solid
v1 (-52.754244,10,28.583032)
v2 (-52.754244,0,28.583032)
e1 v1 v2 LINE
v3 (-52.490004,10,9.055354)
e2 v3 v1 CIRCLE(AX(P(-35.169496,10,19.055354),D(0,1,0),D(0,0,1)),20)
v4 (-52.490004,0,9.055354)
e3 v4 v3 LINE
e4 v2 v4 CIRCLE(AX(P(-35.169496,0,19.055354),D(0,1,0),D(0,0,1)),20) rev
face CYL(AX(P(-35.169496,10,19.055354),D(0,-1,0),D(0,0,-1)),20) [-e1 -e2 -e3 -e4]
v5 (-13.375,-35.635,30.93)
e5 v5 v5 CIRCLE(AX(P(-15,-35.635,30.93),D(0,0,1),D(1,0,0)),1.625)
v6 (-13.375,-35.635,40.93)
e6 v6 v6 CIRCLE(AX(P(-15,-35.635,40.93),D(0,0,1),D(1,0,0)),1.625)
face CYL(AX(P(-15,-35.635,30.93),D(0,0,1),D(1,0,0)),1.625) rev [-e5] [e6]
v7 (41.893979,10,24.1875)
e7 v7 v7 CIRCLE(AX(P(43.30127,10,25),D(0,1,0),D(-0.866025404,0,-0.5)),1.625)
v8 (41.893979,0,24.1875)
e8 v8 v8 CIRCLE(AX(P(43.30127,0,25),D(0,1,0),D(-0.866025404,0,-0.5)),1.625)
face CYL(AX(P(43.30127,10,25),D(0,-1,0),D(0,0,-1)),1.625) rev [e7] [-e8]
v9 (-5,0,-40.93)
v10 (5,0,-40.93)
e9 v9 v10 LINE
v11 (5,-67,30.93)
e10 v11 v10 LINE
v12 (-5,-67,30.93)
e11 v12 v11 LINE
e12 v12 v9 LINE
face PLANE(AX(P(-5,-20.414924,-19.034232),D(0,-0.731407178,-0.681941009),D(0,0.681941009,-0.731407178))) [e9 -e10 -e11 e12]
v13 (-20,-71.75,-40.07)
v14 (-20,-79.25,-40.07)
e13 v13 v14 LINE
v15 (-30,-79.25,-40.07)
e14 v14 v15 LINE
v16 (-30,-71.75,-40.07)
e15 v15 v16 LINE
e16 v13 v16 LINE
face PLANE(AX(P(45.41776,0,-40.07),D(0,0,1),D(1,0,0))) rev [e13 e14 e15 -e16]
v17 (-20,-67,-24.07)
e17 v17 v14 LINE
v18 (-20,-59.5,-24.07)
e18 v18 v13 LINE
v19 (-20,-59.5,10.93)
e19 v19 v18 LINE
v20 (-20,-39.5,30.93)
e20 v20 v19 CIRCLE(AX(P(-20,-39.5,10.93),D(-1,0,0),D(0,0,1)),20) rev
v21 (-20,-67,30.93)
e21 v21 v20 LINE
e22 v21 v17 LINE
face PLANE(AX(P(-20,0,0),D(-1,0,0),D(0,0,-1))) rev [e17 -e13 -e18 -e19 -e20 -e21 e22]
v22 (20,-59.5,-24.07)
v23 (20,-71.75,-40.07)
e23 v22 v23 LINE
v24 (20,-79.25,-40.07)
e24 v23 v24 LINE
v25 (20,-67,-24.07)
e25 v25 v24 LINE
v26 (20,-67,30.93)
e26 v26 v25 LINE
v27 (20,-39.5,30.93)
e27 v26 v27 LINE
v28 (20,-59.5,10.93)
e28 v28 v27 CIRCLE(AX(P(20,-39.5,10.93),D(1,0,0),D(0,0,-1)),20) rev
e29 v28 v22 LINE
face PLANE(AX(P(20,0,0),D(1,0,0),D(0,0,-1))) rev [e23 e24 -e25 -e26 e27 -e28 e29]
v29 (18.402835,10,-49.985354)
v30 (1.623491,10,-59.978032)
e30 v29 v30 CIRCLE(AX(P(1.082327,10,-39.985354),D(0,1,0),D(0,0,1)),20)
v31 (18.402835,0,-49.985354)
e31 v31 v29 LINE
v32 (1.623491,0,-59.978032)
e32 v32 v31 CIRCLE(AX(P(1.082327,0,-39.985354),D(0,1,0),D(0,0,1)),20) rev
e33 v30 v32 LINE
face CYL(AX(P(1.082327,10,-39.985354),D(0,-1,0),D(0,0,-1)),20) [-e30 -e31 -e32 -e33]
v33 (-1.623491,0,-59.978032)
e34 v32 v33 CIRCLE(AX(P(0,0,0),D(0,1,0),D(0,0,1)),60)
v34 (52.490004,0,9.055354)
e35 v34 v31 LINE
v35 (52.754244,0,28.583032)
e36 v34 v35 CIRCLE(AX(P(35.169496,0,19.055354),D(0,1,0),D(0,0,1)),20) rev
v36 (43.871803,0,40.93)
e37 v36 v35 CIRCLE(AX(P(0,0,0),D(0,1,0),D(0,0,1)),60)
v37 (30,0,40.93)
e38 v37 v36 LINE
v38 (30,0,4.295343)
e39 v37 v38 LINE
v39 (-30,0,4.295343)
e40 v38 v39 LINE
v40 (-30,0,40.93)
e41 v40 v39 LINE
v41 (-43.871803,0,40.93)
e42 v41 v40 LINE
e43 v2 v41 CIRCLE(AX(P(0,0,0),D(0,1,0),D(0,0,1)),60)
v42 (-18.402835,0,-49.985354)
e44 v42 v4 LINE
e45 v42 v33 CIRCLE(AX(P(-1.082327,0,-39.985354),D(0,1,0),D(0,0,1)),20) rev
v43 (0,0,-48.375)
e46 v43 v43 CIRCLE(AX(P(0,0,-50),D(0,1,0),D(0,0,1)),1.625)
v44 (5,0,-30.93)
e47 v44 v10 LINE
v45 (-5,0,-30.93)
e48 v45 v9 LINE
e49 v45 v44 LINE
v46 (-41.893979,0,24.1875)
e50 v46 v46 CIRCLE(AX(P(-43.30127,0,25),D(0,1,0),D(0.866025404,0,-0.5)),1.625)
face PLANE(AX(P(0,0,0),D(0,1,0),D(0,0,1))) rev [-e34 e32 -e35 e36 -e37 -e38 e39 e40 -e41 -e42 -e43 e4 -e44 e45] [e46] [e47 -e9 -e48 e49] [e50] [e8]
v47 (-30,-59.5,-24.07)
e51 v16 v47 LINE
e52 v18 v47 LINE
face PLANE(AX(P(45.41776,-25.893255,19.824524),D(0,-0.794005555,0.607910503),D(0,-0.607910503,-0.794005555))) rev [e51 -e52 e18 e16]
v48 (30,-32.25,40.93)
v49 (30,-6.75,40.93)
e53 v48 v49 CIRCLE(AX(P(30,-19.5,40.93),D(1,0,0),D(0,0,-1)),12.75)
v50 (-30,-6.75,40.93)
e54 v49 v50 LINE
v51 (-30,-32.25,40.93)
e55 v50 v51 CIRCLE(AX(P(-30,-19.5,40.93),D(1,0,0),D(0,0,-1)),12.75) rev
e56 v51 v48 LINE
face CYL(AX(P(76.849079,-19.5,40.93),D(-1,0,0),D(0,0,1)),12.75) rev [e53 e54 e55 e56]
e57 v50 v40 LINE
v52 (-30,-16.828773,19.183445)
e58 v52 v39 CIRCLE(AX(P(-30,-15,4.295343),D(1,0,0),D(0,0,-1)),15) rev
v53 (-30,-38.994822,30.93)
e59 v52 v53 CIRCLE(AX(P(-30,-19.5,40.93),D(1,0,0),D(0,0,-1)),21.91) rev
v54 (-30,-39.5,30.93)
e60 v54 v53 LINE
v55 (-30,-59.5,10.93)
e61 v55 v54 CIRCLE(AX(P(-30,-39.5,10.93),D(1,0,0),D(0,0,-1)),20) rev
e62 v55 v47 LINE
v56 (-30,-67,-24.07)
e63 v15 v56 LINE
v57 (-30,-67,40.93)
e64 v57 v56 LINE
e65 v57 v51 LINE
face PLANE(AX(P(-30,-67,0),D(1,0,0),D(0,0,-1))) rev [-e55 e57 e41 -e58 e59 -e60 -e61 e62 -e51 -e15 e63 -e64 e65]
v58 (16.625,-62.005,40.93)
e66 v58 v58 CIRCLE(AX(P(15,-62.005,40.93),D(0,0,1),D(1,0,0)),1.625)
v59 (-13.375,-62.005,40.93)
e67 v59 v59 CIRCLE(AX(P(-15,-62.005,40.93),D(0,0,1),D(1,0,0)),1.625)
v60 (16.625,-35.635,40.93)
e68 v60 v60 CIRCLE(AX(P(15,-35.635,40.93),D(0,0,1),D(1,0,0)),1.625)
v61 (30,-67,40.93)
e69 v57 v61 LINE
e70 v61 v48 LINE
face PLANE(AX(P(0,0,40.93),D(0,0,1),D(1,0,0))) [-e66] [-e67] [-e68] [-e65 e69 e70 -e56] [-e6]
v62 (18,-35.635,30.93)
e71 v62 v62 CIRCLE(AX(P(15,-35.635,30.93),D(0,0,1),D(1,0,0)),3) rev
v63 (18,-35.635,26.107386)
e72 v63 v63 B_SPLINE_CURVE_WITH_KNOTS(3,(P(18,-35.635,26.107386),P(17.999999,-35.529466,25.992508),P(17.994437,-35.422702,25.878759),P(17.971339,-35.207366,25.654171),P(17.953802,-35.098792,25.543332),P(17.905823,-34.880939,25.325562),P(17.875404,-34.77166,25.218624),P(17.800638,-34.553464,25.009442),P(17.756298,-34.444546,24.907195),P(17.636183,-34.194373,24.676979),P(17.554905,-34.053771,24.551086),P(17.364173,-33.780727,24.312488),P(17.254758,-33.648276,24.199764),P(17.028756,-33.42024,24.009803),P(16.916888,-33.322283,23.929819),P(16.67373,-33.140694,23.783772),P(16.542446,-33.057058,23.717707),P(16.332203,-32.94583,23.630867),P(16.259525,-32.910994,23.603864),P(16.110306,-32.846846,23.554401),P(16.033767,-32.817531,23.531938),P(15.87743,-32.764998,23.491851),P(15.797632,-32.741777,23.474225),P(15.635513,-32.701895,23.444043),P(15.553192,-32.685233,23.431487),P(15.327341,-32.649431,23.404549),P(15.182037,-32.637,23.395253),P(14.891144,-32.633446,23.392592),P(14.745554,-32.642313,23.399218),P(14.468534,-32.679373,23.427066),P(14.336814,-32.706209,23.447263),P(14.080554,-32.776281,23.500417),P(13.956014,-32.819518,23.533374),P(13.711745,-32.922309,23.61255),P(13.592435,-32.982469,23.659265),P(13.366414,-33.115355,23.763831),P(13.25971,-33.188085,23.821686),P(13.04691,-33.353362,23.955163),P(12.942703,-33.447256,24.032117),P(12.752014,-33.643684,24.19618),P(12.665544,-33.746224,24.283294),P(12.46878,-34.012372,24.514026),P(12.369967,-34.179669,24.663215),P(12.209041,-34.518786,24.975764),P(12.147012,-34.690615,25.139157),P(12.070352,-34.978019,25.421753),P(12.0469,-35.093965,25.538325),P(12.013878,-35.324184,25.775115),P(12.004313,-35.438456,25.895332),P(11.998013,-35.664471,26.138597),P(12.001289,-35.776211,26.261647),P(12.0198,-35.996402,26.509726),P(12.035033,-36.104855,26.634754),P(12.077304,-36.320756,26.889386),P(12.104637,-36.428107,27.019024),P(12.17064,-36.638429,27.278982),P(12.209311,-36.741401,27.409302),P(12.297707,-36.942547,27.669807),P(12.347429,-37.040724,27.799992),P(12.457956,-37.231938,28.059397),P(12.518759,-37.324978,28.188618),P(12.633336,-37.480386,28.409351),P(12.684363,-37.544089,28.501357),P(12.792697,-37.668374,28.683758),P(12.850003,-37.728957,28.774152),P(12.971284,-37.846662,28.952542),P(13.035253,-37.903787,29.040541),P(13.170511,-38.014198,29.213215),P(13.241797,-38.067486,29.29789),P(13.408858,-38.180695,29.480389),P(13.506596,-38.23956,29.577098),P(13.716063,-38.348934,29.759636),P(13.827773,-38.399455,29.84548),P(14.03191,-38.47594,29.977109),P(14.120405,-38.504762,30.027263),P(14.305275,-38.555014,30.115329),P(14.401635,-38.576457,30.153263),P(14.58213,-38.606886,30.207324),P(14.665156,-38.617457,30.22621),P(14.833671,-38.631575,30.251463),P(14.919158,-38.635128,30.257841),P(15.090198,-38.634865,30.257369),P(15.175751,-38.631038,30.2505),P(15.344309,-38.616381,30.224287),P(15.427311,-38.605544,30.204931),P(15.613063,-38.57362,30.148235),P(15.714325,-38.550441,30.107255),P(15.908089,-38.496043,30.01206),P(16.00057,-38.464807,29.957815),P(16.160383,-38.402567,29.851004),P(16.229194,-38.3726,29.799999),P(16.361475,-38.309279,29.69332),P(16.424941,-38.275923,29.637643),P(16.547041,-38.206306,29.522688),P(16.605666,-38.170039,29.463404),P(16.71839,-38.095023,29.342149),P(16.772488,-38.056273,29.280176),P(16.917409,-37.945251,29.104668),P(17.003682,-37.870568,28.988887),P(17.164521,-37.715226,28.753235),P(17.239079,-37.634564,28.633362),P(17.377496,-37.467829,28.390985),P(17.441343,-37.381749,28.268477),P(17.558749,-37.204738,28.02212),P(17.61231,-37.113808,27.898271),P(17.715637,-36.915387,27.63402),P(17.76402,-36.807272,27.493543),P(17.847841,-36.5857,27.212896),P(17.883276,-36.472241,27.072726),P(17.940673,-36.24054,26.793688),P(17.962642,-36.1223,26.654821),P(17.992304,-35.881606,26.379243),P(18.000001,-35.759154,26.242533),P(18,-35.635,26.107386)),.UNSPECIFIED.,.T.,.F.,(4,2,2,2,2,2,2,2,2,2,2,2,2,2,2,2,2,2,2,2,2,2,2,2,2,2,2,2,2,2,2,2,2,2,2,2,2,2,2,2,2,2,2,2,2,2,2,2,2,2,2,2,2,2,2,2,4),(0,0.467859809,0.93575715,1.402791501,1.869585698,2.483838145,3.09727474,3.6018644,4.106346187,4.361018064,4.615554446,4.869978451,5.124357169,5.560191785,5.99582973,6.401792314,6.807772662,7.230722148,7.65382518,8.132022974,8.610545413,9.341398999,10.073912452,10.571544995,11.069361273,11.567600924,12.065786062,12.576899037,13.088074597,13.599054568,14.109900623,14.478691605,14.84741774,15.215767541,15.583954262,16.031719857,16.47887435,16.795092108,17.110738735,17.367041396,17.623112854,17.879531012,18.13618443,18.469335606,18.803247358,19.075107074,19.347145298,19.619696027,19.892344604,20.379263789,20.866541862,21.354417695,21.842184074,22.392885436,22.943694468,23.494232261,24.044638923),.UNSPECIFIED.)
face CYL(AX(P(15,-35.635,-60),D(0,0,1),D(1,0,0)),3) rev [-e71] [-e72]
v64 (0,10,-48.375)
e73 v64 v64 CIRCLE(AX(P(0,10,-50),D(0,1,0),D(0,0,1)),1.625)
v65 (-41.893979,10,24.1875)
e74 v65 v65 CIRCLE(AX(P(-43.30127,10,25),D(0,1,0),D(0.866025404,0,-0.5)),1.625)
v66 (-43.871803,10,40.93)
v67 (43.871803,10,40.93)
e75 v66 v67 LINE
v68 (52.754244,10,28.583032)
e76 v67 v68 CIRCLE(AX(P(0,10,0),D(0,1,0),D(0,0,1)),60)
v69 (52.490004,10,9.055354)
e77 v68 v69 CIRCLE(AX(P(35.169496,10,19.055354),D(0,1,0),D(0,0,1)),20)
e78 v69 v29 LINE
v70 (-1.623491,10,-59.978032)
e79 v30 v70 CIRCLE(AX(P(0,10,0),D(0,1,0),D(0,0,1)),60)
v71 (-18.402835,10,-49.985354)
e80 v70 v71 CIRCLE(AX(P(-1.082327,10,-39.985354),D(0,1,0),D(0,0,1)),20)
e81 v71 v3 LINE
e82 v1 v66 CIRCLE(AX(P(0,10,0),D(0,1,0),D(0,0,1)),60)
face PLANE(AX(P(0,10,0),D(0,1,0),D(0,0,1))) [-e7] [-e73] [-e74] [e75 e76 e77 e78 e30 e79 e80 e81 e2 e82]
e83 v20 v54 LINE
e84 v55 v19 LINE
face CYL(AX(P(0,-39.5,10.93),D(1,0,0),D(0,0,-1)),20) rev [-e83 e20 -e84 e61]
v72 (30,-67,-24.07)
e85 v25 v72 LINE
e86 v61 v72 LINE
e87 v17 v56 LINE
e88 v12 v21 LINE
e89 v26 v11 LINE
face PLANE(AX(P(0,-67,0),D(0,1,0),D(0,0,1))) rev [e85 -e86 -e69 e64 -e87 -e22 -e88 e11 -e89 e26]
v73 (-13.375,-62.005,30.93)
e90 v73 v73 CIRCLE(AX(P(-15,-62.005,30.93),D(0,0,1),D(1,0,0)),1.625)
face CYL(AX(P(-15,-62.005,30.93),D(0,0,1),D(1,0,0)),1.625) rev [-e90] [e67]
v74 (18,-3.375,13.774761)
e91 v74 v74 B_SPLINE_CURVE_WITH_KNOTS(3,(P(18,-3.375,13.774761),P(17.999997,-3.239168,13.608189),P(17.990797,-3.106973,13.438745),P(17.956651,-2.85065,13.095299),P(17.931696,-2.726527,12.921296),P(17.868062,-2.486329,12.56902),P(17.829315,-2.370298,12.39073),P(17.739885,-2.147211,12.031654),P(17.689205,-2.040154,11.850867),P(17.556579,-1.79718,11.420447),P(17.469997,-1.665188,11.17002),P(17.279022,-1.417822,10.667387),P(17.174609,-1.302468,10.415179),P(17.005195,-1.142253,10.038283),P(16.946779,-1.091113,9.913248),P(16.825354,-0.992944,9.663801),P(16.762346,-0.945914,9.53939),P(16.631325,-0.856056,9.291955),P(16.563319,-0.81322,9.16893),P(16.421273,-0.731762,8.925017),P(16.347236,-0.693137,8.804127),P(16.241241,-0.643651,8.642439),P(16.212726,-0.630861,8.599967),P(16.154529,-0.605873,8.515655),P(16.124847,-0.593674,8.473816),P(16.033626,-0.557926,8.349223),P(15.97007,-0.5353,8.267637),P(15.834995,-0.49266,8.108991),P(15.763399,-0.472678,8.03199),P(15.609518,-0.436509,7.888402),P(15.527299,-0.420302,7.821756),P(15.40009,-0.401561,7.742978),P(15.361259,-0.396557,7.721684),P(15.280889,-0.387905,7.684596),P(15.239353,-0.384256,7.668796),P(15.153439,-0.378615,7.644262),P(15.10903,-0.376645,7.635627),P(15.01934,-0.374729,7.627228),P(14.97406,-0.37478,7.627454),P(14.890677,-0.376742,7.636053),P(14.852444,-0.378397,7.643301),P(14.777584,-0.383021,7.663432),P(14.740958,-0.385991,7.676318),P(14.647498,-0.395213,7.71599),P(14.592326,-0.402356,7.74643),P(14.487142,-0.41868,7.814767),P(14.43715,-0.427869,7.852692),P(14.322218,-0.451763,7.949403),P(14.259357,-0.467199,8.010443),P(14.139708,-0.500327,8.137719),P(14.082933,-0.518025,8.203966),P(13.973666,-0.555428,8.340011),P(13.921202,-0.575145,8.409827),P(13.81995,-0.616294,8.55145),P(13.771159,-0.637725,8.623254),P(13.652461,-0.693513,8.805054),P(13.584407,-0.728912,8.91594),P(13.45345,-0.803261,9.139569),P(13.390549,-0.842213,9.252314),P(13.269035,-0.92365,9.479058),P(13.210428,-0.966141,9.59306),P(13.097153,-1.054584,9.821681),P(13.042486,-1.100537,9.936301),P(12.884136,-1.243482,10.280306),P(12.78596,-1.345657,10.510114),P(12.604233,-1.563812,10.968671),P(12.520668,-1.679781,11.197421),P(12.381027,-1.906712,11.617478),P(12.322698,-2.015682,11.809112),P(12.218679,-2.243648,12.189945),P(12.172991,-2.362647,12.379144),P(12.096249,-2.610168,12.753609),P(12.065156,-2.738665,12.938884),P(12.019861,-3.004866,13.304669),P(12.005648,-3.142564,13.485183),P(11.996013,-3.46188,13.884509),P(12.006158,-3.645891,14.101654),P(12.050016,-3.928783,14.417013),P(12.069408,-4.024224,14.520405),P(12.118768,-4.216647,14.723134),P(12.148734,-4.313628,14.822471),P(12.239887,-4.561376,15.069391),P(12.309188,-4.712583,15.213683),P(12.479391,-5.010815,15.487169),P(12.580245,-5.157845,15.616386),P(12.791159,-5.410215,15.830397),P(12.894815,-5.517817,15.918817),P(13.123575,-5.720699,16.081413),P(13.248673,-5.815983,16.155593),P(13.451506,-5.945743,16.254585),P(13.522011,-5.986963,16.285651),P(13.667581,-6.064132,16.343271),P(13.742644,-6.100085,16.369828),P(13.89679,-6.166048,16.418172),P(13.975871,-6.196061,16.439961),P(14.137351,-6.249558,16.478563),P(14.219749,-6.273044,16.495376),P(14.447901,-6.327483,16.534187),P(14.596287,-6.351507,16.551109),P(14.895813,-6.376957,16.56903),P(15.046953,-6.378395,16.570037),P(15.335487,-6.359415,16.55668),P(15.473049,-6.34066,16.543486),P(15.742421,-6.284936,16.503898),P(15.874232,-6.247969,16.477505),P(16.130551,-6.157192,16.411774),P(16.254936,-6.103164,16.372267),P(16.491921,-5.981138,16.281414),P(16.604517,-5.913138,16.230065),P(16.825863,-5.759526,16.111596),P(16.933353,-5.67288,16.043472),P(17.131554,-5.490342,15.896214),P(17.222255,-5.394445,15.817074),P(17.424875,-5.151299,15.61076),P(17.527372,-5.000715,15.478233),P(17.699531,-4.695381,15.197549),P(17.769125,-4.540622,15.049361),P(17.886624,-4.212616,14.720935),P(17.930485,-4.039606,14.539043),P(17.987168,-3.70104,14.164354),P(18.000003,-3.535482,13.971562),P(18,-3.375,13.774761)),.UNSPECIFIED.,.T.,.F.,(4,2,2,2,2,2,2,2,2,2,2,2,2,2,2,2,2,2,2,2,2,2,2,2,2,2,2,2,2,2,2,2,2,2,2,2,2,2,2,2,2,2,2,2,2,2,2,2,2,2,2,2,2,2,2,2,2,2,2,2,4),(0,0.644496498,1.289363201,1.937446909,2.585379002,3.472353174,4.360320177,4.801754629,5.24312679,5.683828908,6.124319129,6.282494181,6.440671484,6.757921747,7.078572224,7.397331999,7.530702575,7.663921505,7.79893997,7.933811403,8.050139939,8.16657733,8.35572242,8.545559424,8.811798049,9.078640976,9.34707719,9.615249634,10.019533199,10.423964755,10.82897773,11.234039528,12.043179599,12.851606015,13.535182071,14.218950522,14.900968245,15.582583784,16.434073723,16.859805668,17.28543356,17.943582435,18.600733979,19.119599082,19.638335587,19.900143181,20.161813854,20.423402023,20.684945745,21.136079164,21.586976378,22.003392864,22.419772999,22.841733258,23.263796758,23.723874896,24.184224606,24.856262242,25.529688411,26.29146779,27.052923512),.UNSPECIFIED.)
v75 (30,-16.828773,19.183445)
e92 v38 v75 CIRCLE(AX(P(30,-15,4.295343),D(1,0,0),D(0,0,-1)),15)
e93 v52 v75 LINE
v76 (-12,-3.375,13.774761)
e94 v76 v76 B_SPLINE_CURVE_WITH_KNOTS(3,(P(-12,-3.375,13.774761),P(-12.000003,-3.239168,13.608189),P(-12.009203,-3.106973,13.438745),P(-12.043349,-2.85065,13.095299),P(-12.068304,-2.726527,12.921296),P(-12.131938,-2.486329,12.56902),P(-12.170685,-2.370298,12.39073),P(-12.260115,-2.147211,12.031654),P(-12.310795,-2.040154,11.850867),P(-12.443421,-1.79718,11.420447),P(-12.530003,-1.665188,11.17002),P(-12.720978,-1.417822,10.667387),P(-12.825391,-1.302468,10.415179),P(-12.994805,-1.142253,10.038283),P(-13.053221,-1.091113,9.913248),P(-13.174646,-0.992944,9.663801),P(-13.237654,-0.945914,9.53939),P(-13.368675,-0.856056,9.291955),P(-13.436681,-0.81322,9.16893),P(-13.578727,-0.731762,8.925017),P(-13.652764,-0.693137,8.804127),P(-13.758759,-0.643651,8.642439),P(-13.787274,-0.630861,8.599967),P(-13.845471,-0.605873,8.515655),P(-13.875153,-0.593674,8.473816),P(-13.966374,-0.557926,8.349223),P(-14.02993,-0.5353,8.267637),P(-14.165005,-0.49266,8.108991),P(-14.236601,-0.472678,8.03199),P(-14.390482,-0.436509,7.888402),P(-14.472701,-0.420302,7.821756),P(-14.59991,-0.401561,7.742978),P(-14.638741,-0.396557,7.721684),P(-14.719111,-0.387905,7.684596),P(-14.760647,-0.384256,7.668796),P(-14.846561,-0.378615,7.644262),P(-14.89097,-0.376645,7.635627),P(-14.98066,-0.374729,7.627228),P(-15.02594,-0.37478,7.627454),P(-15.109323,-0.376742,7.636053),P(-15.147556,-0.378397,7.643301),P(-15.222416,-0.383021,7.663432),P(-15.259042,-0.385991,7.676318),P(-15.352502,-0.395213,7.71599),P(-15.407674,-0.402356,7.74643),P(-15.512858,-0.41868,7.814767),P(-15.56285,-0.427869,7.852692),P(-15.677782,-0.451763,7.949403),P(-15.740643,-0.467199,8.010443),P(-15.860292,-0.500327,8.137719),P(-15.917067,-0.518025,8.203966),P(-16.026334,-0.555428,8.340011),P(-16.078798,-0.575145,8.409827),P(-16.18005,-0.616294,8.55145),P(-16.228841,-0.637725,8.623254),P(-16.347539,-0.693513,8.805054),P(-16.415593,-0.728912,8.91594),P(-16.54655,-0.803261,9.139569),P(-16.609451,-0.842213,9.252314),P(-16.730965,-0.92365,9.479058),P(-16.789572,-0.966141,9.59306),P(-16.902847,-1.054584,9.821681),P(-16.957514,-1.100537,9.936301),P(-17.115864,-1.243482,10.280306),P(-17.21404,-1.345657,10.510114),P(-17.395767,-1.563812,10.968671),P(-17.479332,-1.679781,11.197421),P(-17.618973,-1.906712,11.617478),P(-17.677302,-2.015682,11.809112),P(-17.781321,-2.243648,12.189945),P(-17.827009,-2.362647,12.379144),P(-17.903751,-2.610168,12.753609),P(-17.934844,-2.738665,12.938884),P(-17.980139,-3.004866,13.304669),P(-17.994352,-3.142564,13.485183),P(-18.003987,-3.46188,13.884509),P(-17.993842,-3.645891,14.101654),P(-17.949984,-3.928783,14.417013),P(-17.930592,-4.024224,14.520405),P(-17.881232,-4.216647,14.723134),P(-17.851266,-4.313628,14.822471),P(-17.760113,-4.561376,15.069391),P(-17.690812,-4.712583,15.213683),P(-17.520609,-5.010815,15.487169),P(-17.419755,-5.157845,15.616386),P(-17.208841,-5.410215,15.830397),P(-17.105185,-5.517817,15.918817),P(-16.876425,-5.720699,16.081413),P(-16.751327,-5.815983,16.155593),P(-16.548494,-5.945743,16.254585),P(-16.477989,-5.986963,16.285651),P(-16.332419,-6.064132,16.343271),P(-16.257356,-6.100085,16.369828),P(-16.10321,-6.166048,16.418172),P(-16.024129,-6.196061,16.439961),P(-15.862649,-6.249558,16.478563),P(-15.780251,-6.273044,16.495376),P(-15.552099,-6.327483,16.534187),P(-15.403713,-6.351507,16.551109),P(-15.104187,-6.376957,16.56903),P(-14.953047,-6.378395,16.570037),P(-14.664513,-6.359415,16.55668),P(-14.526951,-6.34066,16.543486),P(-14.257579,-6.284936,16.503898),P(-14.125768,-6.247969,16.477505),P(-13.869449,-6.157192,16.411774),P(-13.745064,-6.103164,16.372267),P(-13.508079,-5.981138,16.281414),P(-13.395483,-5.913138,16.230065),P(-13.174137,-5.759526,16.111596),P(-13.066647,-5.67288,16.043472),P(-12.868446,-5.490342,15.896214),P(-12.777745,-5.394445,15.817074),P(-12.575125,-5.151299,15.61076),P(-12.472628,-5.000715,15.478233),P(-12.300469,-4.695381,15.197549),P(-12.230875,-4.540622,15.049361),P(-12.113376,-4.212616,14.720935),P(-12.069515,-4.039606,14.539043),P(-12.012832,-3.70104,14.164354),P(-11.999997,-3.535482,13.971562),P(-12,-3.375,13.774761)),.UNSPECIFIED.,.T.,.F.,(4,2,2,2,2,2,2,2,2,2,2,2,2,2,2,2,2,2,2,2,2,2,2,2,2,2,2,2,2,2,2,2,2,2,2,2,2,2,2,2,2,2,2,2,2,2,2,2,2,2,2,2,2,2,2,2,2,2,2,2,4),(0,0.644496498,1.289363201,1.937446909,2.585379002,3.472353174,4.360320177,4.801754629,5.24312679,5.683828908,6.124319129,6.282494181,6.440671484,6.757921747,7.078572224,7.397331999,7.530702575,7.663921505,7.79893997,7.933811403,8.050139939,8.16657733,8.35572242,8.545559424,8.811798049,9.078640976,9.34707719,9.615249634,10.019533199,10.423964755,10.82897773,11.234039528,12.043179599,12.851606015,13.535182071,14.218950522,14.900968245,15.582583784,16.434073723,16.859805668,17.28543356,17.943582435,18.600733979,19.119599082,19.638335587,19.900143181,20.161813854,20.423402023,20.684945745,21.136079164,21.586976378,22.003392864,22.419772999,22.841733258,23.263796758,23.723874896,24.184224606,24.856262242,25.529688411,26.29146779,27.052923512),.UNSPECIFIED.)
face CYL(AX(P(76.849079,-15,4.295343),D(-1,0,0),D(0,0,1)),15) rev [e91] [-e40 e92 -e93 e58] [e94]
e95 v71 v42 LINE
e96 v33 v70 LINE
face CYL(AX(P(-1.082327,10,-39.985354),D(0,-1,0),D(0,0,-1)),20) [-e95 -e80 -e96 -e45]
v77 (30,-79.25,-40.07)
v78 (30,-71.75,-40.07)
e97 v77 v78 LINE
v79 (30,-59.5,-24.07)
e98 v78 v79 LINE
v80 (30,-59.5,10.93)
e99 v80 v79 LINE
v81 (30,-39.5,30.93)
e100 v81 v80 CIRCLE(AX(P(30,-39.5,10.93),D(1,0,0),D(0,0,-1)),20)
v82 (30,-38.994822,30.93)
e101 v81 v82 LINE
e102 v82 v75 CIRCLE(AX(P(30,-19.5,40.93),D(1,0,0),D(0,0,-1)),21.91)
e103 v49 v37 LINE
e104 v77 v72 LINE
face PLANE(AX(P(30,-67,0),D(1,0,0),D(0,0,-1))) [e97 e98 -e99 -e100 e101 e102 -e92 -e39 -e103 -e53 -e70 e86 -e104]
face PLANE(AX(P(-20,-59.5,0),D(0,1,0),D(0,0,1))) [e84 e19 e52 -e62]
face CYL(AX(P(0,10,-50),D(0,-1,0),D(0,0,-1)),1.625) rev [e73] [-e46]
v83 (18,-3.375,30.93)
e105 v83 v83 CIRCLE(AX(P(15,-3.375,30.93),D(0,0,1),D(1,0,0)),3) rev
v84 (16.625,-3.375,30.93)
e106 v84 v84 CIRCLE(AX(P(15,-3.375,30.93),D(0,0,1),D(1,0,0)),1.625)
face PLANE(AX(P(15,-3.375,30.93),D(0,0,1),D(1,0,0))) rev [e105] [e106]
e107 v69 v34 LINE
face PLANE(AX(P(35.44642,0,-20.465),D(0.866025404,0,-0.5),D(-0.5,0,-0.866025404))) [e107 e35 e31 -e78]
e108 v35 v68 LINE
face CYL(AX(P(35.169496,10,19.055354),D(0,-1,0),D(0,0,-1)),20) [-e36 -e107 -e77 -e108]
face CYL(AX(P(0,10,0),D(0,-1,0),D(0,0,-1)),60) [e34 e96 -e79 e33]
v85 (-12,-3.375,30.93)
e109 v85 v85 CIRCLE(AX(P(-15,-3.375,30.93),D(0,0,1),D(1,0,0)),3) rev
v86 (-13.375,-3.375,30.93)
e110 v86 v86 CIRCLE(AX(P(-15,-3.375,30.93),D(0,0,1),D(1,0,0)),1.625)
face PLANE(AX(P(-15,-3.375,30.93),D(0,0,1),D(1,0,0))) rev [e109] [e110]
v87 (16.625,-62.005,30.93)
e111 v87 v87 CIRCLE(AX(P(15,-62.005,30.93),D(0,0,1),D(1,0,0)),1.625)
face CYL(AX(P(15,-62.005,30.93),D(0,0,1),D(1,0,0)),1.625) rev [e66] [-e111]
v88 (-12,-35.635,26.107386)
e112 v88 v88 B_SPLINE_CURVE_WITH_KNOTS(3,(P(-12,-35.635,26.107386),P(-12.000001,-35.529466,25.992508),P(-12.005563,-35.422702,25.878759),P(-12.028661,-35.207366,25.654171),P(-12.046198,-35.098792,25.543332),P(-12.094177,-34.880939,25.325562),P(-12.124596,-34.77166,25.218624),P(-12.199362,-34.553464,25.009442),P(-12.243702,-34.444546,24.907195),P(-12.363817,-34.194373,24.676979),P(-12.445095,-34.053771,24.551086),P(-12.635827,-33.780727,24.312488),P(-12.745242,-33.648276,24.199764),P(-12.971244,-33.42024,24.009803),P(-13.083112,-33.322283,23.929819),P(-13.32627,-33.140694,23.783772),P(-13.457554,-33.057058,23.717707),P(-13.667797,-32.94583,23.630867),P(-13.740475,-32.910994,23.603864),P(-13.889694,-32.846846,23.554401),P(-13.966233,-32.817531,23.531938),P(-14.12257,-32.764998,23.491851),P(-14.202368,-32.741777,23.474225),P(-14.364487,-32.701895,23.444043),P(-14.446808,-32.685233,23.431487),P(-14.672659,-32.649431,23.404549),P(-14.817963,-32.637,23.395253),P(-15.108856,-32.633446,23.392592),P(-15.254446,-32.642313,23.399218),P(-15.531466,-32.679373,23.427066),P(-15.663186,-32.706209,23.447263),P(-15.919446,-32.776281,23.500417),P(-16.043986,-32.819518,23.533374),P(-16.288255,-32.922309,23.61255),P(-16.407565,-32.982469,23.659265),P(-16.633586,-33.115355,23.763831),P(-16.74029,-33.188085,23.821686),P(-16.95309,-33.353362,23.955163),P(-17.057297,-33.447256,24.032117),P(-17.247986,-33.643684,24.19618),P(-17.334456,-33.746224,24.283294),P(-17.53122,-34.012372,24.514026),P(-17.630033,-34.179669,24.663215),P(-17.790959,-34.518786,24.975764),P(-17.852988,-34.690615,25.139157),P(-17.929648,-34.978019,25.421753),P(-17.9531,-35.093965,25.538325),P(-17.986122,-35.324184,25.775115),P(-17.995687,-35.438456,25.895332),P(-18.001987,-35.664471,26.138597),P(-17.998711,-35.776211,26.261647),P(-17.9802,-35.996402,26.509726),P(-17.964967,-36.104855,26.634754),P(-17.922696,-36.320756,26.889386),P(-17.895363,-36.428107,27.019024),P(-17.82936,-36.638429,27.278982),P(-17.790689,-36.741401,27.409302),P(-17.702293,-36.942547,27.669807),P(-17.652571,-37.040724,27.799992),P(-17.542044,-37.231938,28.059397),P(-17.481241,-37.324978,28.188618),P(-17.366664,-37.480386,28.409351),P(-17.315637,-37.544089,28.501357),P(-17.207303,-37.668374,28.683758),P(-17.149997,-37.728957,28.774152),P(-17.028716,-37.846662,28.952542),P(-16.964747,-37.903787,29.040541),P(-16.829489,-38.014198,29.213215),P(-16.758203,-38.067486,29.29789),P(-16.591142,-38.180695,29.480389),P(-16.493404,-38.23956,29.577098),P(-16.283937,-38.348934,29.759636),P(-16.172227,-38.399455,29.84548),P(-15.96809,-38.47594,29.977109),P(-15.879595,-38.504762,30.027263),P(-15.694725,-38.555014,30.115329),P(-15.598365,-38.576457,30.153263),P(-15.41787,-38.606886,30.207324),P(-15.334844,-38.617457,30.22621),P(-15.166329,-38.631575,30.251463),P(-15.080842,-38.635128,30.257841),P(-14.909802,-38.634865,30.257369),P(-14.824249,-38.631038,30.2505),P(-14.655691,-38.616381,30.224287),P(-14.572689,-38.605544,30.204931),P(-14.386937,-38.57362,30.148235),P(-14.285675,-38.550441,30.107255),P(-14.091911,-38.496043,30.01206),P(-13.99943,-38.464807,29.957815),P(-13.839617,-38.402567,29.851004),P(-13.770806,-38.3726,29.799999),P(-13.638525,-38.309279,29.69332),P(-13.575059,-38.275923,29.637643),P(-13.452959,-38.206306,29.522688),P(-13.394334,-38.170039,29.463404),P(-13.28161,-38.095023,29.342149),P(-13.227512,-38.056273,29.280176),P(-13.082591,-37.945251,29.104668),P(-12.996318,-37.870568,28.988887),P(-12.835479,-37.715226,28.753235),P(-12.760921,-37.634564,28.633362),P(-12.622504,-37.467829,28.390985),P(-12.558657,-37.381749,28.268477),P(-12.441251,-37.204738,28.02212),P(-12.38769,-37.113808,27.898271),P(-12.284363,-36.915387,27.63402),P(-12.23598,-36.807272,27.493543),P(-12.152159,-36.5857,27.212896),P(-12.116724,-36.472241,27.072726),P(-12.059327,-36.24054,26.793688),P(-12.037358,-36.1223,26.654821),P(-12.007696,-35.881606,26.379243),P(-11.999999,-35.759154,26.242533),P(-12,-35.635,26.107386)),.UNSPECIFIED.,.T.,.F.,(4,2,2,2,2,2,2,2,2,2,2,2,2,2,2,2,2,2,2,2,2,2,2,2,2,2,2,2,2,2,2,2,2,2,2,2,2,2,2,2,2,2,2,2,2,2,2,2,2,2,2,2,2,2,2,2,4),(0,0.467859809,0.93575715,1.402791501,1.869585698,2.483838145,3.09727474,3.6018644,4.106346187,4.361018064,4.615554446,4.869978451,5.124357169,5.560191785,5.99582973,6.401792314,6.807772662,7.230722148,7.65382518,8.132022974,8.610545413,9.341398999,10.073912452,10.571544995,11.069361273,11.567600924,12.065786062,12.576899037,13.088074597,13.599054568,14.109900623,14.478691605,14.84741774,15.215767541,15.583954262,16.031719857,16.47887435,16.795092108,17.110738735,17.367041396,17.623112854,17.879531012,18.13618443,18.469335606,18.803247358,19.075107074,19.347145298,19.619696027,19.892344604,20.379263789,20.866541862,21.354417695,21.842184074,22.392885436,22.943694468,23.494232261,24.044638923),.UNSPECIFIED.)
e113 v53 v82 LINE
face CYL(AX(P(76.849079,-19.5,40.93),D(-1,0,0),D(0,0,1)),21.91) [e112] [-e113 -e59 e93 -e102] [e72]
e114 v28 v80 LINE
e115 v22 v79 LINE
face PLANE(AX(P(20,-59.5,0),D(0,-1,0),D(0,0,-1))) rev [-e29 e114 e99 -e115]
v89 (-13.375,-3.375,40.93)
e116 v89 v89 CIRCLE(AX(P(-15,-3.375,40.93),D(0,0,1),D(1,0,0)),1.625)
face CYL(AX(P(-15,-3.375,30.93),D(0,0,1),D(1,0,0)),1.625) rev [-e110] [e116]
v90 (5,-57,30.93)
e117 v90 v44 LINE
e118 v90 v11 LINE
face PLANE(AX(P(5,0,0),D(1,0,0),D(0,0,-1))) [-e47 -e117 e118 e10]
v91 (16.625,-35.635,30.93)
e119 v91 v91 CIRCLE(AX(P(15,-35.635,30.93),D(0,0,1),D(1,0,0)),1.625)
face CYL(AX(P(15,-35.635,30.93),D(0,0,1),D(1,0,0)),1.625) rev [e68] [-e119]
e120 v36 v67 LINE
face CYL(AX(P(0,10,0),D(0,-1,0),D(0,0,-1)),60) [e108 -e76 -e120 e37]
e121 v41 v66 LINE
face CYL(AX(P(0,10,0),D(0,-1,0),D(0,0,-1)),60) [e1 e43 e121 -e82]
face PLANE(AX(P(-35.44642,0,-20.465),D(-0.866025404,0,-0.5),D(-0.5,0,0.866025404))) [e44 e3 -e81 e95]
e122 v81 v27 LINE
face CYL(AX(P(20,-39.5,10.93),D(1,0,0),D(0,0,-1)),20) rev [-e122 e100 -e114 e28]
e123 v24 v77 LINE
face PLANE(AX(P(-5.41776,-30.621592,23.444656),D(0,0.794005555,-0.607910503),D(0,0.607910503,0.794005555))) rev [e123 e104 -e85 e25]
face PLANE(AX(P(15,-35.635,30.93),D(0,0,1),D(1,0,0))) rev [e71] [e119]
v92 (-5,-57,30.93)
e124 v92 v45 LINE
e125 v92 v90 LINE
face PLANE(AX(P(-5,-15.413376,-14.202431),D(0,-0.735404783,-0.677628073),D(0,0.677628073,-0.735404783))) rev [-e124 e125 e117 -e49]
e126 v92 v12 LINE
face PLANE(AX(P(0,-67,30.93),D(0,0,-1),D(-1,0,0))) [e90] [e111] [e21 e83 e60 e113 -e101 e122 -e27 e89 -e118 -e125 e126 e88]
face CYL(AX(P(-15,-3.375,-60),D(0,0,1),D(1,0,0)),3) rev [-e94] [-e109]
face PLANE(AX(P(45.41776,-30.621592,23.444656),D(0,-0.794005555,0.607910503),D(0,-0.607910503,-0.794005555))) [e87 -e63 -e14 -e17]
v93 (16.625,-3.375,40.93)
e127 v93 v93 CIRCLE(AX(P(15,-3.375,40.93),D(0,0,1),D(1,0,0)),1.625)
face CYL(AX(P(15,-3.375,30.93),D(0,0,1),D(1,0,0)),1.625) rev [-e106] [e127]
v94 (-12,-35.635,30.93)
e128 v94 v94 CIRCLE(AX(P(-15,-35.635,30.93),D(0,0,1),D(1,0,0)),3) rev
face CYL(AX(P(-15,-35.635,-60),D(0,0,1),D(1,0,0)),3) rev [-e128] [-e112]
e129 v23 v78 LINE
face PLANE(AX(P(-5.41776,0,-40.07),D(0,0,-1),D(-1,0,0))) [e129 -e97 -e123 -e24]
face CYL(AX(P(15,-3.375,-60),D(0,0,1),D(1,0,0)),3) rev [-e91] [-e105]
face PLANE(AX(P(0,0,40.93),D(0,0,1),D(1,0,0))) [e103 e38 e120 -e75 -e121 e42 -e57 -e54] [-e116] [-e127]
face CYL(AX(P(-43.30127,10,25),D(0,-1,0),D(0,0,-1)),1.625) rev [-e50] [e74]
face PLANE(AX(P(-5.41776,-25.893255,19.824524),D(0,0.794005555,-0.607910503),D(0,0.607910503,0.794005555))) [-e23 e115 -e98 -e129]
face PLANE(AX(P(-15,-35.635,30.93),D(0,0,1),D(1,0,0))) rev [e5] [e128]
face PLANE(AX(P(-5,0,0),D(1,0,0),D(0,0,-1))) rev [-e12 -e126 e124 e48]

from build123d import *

# Parameters (mm, degrees)
SKETCH1_R                       = 60
BOSS_EXTRUDE1_DEPTH             = 10
SKETCH1_3_R                     = 1.625
CUT_EXTRUDE1_DEPTH              = 86.440037453
CIRPATTERN1_COUNT               = 3
CUT_EXTRUDE2_DEPTH              = 86.440037453
CIRPATTERN2_COUNT               = 3
BOSS_EXTRUDE2_DEPTH             = 77
BOSS_EXTRUDE3_REACH             = 108.685
BOSS_EXTRUDE3_DIRECTION_2_REACH = 108.685
FILLET1_R                       = 15
CUT_EXTRUDE3_DEPTH              = 107.685194831
CUT_EXTRUDE3_DEPTH_BACK         = 107.685194831
SKETCH4_4_R                     = 12.75
BOSS_EXTRUDE4_DEPTH             = 5
BOSS_EXTRUDE4_DEPTH_BACK        = 5
SKETCH7_R                       = 3
CUT_EXTRUDE4_DEPTH              = 135.046990627
SKETCH8_R                       = 3
SKETCH8_R_2                     = 1.625
BOSS_EXTRUDE5_DEPTH             = 10
LPATTERN2_COUNT                 = 2
LPATTERN2_PITCH                 = 32.26
LPATTERN3_COUNT                 = 2
LPATTERN3_PITCH                 = 58.63
FILLET2_R                       = 20
FILLET3_R                       = 20
FILLET4_R                       = 20
FILLET5_R                       = 20
SKETCH9_W                       = 55
SKETCH9_H                       = 7.5
BOSS_EXTRUDE6_DEPTH             = 10
BOSS_EXTRUDE7_DEPTH             = 10
FILLET6_R                       = 20
FILLET7_R                       = 20


with BuildPart() as part:
    # Sketch1 → Boss-Extrude1 (new body)
    with BuildSketch(Plane(origin=(0, 0, 0), x_dir=(1, 0, 0), z_dir=(0, 1, 0))):
        with Locations(Location((0, 0, 0), (0, 0, 270))):
            Circle(SKETCH1_R)
    extrude(amount=BOSS_EXTRUDE1_DEPTH)

    # Sketch1<3> → Cut-Extrude1 (cut, through all)
    with BuildSketch(Plane(origin=(0, 0, 0), x_dir=(1, 0, 0), z_dir=(0, 1, 0))):
        with Locations(Location((0, 50, 0), (0, 0, 270))):
            Circle(SKETCH1_3_R)
    cut_extrude1 = extrude(amount=CUT_EXTRUDE1_DEPTH, mode=Mode.SUBTRACT)

    # CirPattern1: Cut-Extrude1 ×3 about axis
    cirpattern1_axis = Axis((0, 0, 0), (0, 1, 0))
    for i in range(1, CIRPATTERN1_COUNT):
        add(cut_extrude1.rotate(cirpattern1_axis, i * 360 / CIRPATTERN1_COUNT), mode=Mode.SUBTRACT)

    # Sketch2 → Cut-Extrude2 (cut, through all)
    with BuildSketch(Plane(origin=(0, 10, 0), x_dir=(1, 0, 0), z_dir=(0, 1, 0))):
        with BuildLine():
            Line((43.871803017, -40.93), (0, -40.93))
            Line((0, -40.93), (-43.871803017, -40.93))
            ThreePointArc((-43.871803017, -40.93), (0, -60), (43.871803017, -40.93))
        make_face()
    cut_extrude2 = extrude(amount=-CUT_EXTRUDE2_DEPTH, mode=Mode.SUBTRACT)

    # CirPattern2: Cut-Extrude2 ×3 about axis
    cirpattern2_axis = Axis((0, 10.5, 0), (0, -1, 0))
    for i in range(1, CIRPATTERN2_COUNT):
        add(cut_extrude2.rotate(cirpattern2_axis, i * 360 / CIRPATTERN2_COUNT), mode=Mode.SUBTRACT)

    # Sketch3 → Boss-Extrude2 (add)
    with BuildSketch(Plane(origin=(0, 10, 0), x_dir=(1, 0, 0), z_dir=(0, 1, 0))):
        Polygon((-30, -40.93), (0, -40.93), (30, -40.93), (30, -30.93), (-30, -30.93), align=None)
    extrude(amount=-BOSS_EXTRUDE2_DEPTH)

    # Boss-Extrude3: up to this face of the body (flat: up to its plane)
    boss_extrude3_end = Plane(part.part.faces().sort_by_distance((30, -33.5, 35.93))[0])
    # Sketch4 → Boss-Extrude3 (add, up to the picked face)
    with BuildSketch(Plane(origin=(0, 0, 0), x_dir=(0, 0, -1), z_dir=(1, 0, 0)), mode=Mode.PRIVATE) as boss_extrude3_sk1:
        with BuildLine():
            ThreePointArc((-19.02, -19.5), (-22.236059714, -8.072633873), (-30.940100101, 0))
            Line((-30.940100101, 0), (-40.93, 0))
            Line((-40.93, 0), (-40.93, -6.75))
            ThreePointArc((-40.93, -6.75), (-31.91438854, -10.48438854), (-28.18, -19.5))
            ThreePointArc((-28.18, -19.5), (-31.91438854, -28.51561146), (-40.93, -32.25))
            Line((-40.93, -32.25), (-40.93, -41.41))
            ThreePointArc((-40.93, -41.41), (-25.437290424, -34.992709576), (-19.02, -19.5))
        make_face()
    boss_extrude3_tool1 = split(extrude(boss_extrude3_sk1.sketch, amount=BOSS_EXTRUDE3_REACH, mode=Mode.PRIVATE), bisect_by=boss_extrude3_end, keep=Keep.BOTH, mode=Mode.PRIVATE)
    add(boss_extrude3_tool1.solids().sort_by(Axis((0, -10.153116, 31.583116), (1, 0, 0)))[0])

    # Boss-Extrude3 direction 2: up to this face of the body (flat: up to its plane)
    boss_extrude3_direction_2_end = Plane(part.part.faces().sort_by_distance((-30, -33.5, 35.93))[0])
    # Sketch4 → Boss-Extrude3 direction 2 (add, up to the picked face)
    with BuildSketch(Plane(origin=(0, 0, 0), x_dir=(0, 0, -1), z_dir=(1, 0, 0)), mode=Mode.PRIVATE) as boss_extrude3_direction_2_sk1:
        with BuildLine():
            ThreePointArc((-19.02, -19.5), (-22.236059714, -8.072633873), (-30.940100101, 0))
            Line((-30.940100101, 0), (-40.93, 0))
            Line((-40.93, 0), (-40.93, -6.75))
            ThreePointArc((-40.93, -6.75), (-31.91438854, -10.48438854), (-28.18, -19.5))
            ThreePointArc((-28.18, -19.5), (-31.91438854, -28.51561146), (-40.93, -32.25))
            Line((-40.93, -32.25), (-40.93, -41.41))
            ThreePointArc((-40.93, -41.41), (-25.437290424, -34.992709576), (-19.02, -19.5))
        make_face()
    boss_extrude3_direction_2_tool1 = split(extrude(boss_extrude3_direction_2_sk1.sketch, amount=-BOSS_EXTRUDE3_DIRECTION_2_REACH, mode=Mode.PRIVATE), bisect_by=boss_extrude3_direction_2_end, keep=Keep.BOTH, mode=Mode.PRIVATE)
    add(boss_extrude3_direction_2_tool1.solids().sort_by(Axis((0, -10.153116, 31.583116), (-1, 0, 0)))[0])

    # Fillet1
    # the kernel refuses this fillet: 15 mm, written as the material it adds along each edge
    with BuildSketch(Plane(origin=(30, 0, 30.93), x_dir=(0, -0.8200000187317444, -0.5723634940140216), z_dir=(-1, 0, 0))) as fillet1_piece_1:
        with BuildLine():
            CenterArc((27.544705674, -13.254966901), FILLET1_R, 117.912385257, 97.002819116)
            Line((15.244705393, -21.840419312), (14.014705365, -22.698964553))
            Line((14.014705365, -22.698964553), (-1.230000028, -0.858545241))
            Line((-1.230000028, -0.858545241), (-0.858545241, 1.230000028))
            ThreePointArc((-0.858545241, 1.230000028), (0.706809752, 1.32825728), (19.820711794, 1.32549669))
            Line((19.820711794, 1.32549669), (20.522893056, 0))
        make_face()
    extrude(amount=60)
    with BuildSketch(Plane(origin=(30, -0.00517761, 30.93), x_dir=(0, -0.819917344642304, -0.5724819193255918), z_dir=(-1, 0, 0))) as fillet1_piece_2:
        with BuildLine():
            CenterArc((27.542374568, -13.253952614), FILLET1_R, 117.920660394, 97.002819116)
            Line((15.243614398, -21.841181404), (14.013738381, -22.699904283))
            ThreePointArc((14.013738381, -22.699904283), (-1.23412123, -0.861686967), (-0.858722879, 1.229876017))
            Line((-0.858722879, 1.229876017), (0.702372694, 1.325395261))
            ThreePointArc((0.702372694, 1.325395261), (10.259323815, -1.050393215), (19.816274935, 1.325395261))
            Line((19.816274935, 1.325395261), (20.518647629, 0))
        make_face()
    extrude(amount=60)

    # Sketch4<4> → Cut-Extrude3 (cut, two sides: drawn at the far end of the back side and taken through both)
    with BuildSketch(Plane(origin=(0, 0, 0), x_dir=(0, 0, -1), z_dir=(1, 0, 0)).offset(-CUT_EXTRUDE3_DEPTH_BACK)):
        with Locations((-40.93, -19.5)):
            Circle(SKETCH4_4_R)
    extrude(amount=CUT_EXTRUDE3_DEPTH + CUT_EXTRUDE3_DEPTH_BACK, mode=Mode.SUBTRACT)

    # Sketch6 → Boss-Extrude4 (add, two sides: drawn at the far end of the back side and taken through both)
    with BuildSketch(Plane(origin=(0, 0, 0), x_dir=(0, 0, -1), z_dir=(1, 0, 0)).offset(-BOSS_EXTRUDE4_DEPTH_BACK)):
        Polygon((-30.93, -57), (-30.93, -67), (40.93, 0), (30.93, 0), align=None)
    extrude(amount=BOSS_EXTRUDE4_DEPTH + BOSS_EXTRUDE4_DEPTH_BACK)

    # Sketch7 → Cut-Extrude4 (cut, through all)
    with BuildSketch(Plane.XY.offset(40.93)):
        with Locations((-15, -3.375)):
            Circle(SKETCH7_R)
        with Locations((15, -3.375)):
            Circle(SKETCH7_R)
    cut_extrude4 = extrude(amount=-CUT_EXTRUDE4_DEPTH, mode=Mode.SUBTRACT)

    # Sketch8 → Boss-Extrude5 (add)
    # profile 1 of 2: a face of its own
    with BuildSketch(Plane.XY.offset(40.93)):
        with Locations((-15, -3.375)):
            Circle(SKETCH8_R)
        with Locations((-15, -3.375)):
            Circle(SKETCH8_R_2, mode=Mode.SUBTRACT)
    # profile 2 of 2: a face of its own
    with BuildSketch(Plane.XY.offset(40.93)):
        with Locations((15, -3.375)):
            Circle(SKETCH8_R)
        with Locations((15, -3.375)):
            Circle(SKETCH8_R_2, mode=Mode.SUBTRACT)
    boss_extrude5 = extrude(amount=-BOSS_EXTRUDE5_DEPTH)

    # LPattern2: Cut-Extrude4, Boss-Extrude5 ×2
    with Locations(*[(0, -i * LPATTERN2_PITCH, 0) for i in range(1, LPATTERN2_COUNT)]):
        add(cut_extrude4, mode=Mode.SUBTRACT)
        add(boss_extrude5)

    # LPattern3: Cut-Extrude4, Boss-Extrude5 ×2
    with Locations(*[(0, -i * LPATTERN3_PITCH, 0) for i in range(1, LPATTERN3_COUNT)]):
        add(cut_extrude4, mode=Mode.SUBTRACT)
        add(boss_extrude5)

    # Fillet2
    fillet2_edges = [part.edges().sort_by_distance(p)[0] for p in [
        (57.382321286, 5, 17.529095923),
    ]]
    fillet(fillet2_edges, radius=FILLET2_R)

    # Fillet3
    fillet3_edges = [part.edges().sort_by_distance(p)[0] for p in [
        (13.510518268, 5, -58.459095923),
    ]]
    fillet(fillet3_edges, radius=FILLET3_R)

    # Fillet4
    fillet4_edges = [part.edges().sort_by_distance(p)[0] for p in [
        (-13.510518268, 5, -58.459095923),
    ]]
    fillet(fillet4_edges, radius=FILLET4_R)

    # Fillet5
    fillet5_edges = [part.edges().sort_by_distance(p)[0] for p in [
        (-57.382321286, 5, 17.529095923),
    ]]
    fillet(fillet5_edges, radius=FILLET5_R)

    # Sketch9 → Boss-Extrude6 (add)
    with BuildSketch(Plane(origin=(30, 0, 0), x_dir=(0, 0, -1), z_dir=(1, 0, 0))):
        with Locations((-3.43, -63.25)):
            Rectangle(SKETCH9_W, SKETCH9_H)
    boss_extrude6 = extrude(amount=-BOSS_EXTRUDE6_DEPTH)

    # Sketch10 → Boss-Extrude7 (add)
    with BuildSketch(Plane(origin=(30, 0, 0), x_dir=(0, 0, -1), z_dir=(1, 0, 0))):
        Polygon((40.07, -79.25), (40.07, -71.75), (24.07, -59.5), (24.07, -67), align=None)
    boss_extrude7 = extrude(amount=-BOSS_EXTRUDE7_DEPTH)

    # Fillet6
    fillet6_edges = [part.edges().sort_by_distance(p)[0] for p in [
        (25, -59.5, 30.93),
    ]]
    fillet(fillet6_edges, radius=FILLET6_R)

    # Mirror1: Boss-Extrude6, Boss-Extrude7 across plane
    add(boss_extrude6.mirror(Plane(origin=(0, 0, 0), x_dir=(0, 0, 1), z_dir=(1, 0, 0))))
    add(boss_extrude7.mirror(Plane(origin=(0, 0, 0), x_dir=(0, 0, 1), z_dir=(1, 0, 0))))

    # Fillet7
    fillet7_edges = [part.edges().sort_by_distance(p)[0] for p in [
        (-25, -59.5, 30.93),
    ]]
    fillet(fillet7_edges, radius=FILLET7_R)


solid = part.part
